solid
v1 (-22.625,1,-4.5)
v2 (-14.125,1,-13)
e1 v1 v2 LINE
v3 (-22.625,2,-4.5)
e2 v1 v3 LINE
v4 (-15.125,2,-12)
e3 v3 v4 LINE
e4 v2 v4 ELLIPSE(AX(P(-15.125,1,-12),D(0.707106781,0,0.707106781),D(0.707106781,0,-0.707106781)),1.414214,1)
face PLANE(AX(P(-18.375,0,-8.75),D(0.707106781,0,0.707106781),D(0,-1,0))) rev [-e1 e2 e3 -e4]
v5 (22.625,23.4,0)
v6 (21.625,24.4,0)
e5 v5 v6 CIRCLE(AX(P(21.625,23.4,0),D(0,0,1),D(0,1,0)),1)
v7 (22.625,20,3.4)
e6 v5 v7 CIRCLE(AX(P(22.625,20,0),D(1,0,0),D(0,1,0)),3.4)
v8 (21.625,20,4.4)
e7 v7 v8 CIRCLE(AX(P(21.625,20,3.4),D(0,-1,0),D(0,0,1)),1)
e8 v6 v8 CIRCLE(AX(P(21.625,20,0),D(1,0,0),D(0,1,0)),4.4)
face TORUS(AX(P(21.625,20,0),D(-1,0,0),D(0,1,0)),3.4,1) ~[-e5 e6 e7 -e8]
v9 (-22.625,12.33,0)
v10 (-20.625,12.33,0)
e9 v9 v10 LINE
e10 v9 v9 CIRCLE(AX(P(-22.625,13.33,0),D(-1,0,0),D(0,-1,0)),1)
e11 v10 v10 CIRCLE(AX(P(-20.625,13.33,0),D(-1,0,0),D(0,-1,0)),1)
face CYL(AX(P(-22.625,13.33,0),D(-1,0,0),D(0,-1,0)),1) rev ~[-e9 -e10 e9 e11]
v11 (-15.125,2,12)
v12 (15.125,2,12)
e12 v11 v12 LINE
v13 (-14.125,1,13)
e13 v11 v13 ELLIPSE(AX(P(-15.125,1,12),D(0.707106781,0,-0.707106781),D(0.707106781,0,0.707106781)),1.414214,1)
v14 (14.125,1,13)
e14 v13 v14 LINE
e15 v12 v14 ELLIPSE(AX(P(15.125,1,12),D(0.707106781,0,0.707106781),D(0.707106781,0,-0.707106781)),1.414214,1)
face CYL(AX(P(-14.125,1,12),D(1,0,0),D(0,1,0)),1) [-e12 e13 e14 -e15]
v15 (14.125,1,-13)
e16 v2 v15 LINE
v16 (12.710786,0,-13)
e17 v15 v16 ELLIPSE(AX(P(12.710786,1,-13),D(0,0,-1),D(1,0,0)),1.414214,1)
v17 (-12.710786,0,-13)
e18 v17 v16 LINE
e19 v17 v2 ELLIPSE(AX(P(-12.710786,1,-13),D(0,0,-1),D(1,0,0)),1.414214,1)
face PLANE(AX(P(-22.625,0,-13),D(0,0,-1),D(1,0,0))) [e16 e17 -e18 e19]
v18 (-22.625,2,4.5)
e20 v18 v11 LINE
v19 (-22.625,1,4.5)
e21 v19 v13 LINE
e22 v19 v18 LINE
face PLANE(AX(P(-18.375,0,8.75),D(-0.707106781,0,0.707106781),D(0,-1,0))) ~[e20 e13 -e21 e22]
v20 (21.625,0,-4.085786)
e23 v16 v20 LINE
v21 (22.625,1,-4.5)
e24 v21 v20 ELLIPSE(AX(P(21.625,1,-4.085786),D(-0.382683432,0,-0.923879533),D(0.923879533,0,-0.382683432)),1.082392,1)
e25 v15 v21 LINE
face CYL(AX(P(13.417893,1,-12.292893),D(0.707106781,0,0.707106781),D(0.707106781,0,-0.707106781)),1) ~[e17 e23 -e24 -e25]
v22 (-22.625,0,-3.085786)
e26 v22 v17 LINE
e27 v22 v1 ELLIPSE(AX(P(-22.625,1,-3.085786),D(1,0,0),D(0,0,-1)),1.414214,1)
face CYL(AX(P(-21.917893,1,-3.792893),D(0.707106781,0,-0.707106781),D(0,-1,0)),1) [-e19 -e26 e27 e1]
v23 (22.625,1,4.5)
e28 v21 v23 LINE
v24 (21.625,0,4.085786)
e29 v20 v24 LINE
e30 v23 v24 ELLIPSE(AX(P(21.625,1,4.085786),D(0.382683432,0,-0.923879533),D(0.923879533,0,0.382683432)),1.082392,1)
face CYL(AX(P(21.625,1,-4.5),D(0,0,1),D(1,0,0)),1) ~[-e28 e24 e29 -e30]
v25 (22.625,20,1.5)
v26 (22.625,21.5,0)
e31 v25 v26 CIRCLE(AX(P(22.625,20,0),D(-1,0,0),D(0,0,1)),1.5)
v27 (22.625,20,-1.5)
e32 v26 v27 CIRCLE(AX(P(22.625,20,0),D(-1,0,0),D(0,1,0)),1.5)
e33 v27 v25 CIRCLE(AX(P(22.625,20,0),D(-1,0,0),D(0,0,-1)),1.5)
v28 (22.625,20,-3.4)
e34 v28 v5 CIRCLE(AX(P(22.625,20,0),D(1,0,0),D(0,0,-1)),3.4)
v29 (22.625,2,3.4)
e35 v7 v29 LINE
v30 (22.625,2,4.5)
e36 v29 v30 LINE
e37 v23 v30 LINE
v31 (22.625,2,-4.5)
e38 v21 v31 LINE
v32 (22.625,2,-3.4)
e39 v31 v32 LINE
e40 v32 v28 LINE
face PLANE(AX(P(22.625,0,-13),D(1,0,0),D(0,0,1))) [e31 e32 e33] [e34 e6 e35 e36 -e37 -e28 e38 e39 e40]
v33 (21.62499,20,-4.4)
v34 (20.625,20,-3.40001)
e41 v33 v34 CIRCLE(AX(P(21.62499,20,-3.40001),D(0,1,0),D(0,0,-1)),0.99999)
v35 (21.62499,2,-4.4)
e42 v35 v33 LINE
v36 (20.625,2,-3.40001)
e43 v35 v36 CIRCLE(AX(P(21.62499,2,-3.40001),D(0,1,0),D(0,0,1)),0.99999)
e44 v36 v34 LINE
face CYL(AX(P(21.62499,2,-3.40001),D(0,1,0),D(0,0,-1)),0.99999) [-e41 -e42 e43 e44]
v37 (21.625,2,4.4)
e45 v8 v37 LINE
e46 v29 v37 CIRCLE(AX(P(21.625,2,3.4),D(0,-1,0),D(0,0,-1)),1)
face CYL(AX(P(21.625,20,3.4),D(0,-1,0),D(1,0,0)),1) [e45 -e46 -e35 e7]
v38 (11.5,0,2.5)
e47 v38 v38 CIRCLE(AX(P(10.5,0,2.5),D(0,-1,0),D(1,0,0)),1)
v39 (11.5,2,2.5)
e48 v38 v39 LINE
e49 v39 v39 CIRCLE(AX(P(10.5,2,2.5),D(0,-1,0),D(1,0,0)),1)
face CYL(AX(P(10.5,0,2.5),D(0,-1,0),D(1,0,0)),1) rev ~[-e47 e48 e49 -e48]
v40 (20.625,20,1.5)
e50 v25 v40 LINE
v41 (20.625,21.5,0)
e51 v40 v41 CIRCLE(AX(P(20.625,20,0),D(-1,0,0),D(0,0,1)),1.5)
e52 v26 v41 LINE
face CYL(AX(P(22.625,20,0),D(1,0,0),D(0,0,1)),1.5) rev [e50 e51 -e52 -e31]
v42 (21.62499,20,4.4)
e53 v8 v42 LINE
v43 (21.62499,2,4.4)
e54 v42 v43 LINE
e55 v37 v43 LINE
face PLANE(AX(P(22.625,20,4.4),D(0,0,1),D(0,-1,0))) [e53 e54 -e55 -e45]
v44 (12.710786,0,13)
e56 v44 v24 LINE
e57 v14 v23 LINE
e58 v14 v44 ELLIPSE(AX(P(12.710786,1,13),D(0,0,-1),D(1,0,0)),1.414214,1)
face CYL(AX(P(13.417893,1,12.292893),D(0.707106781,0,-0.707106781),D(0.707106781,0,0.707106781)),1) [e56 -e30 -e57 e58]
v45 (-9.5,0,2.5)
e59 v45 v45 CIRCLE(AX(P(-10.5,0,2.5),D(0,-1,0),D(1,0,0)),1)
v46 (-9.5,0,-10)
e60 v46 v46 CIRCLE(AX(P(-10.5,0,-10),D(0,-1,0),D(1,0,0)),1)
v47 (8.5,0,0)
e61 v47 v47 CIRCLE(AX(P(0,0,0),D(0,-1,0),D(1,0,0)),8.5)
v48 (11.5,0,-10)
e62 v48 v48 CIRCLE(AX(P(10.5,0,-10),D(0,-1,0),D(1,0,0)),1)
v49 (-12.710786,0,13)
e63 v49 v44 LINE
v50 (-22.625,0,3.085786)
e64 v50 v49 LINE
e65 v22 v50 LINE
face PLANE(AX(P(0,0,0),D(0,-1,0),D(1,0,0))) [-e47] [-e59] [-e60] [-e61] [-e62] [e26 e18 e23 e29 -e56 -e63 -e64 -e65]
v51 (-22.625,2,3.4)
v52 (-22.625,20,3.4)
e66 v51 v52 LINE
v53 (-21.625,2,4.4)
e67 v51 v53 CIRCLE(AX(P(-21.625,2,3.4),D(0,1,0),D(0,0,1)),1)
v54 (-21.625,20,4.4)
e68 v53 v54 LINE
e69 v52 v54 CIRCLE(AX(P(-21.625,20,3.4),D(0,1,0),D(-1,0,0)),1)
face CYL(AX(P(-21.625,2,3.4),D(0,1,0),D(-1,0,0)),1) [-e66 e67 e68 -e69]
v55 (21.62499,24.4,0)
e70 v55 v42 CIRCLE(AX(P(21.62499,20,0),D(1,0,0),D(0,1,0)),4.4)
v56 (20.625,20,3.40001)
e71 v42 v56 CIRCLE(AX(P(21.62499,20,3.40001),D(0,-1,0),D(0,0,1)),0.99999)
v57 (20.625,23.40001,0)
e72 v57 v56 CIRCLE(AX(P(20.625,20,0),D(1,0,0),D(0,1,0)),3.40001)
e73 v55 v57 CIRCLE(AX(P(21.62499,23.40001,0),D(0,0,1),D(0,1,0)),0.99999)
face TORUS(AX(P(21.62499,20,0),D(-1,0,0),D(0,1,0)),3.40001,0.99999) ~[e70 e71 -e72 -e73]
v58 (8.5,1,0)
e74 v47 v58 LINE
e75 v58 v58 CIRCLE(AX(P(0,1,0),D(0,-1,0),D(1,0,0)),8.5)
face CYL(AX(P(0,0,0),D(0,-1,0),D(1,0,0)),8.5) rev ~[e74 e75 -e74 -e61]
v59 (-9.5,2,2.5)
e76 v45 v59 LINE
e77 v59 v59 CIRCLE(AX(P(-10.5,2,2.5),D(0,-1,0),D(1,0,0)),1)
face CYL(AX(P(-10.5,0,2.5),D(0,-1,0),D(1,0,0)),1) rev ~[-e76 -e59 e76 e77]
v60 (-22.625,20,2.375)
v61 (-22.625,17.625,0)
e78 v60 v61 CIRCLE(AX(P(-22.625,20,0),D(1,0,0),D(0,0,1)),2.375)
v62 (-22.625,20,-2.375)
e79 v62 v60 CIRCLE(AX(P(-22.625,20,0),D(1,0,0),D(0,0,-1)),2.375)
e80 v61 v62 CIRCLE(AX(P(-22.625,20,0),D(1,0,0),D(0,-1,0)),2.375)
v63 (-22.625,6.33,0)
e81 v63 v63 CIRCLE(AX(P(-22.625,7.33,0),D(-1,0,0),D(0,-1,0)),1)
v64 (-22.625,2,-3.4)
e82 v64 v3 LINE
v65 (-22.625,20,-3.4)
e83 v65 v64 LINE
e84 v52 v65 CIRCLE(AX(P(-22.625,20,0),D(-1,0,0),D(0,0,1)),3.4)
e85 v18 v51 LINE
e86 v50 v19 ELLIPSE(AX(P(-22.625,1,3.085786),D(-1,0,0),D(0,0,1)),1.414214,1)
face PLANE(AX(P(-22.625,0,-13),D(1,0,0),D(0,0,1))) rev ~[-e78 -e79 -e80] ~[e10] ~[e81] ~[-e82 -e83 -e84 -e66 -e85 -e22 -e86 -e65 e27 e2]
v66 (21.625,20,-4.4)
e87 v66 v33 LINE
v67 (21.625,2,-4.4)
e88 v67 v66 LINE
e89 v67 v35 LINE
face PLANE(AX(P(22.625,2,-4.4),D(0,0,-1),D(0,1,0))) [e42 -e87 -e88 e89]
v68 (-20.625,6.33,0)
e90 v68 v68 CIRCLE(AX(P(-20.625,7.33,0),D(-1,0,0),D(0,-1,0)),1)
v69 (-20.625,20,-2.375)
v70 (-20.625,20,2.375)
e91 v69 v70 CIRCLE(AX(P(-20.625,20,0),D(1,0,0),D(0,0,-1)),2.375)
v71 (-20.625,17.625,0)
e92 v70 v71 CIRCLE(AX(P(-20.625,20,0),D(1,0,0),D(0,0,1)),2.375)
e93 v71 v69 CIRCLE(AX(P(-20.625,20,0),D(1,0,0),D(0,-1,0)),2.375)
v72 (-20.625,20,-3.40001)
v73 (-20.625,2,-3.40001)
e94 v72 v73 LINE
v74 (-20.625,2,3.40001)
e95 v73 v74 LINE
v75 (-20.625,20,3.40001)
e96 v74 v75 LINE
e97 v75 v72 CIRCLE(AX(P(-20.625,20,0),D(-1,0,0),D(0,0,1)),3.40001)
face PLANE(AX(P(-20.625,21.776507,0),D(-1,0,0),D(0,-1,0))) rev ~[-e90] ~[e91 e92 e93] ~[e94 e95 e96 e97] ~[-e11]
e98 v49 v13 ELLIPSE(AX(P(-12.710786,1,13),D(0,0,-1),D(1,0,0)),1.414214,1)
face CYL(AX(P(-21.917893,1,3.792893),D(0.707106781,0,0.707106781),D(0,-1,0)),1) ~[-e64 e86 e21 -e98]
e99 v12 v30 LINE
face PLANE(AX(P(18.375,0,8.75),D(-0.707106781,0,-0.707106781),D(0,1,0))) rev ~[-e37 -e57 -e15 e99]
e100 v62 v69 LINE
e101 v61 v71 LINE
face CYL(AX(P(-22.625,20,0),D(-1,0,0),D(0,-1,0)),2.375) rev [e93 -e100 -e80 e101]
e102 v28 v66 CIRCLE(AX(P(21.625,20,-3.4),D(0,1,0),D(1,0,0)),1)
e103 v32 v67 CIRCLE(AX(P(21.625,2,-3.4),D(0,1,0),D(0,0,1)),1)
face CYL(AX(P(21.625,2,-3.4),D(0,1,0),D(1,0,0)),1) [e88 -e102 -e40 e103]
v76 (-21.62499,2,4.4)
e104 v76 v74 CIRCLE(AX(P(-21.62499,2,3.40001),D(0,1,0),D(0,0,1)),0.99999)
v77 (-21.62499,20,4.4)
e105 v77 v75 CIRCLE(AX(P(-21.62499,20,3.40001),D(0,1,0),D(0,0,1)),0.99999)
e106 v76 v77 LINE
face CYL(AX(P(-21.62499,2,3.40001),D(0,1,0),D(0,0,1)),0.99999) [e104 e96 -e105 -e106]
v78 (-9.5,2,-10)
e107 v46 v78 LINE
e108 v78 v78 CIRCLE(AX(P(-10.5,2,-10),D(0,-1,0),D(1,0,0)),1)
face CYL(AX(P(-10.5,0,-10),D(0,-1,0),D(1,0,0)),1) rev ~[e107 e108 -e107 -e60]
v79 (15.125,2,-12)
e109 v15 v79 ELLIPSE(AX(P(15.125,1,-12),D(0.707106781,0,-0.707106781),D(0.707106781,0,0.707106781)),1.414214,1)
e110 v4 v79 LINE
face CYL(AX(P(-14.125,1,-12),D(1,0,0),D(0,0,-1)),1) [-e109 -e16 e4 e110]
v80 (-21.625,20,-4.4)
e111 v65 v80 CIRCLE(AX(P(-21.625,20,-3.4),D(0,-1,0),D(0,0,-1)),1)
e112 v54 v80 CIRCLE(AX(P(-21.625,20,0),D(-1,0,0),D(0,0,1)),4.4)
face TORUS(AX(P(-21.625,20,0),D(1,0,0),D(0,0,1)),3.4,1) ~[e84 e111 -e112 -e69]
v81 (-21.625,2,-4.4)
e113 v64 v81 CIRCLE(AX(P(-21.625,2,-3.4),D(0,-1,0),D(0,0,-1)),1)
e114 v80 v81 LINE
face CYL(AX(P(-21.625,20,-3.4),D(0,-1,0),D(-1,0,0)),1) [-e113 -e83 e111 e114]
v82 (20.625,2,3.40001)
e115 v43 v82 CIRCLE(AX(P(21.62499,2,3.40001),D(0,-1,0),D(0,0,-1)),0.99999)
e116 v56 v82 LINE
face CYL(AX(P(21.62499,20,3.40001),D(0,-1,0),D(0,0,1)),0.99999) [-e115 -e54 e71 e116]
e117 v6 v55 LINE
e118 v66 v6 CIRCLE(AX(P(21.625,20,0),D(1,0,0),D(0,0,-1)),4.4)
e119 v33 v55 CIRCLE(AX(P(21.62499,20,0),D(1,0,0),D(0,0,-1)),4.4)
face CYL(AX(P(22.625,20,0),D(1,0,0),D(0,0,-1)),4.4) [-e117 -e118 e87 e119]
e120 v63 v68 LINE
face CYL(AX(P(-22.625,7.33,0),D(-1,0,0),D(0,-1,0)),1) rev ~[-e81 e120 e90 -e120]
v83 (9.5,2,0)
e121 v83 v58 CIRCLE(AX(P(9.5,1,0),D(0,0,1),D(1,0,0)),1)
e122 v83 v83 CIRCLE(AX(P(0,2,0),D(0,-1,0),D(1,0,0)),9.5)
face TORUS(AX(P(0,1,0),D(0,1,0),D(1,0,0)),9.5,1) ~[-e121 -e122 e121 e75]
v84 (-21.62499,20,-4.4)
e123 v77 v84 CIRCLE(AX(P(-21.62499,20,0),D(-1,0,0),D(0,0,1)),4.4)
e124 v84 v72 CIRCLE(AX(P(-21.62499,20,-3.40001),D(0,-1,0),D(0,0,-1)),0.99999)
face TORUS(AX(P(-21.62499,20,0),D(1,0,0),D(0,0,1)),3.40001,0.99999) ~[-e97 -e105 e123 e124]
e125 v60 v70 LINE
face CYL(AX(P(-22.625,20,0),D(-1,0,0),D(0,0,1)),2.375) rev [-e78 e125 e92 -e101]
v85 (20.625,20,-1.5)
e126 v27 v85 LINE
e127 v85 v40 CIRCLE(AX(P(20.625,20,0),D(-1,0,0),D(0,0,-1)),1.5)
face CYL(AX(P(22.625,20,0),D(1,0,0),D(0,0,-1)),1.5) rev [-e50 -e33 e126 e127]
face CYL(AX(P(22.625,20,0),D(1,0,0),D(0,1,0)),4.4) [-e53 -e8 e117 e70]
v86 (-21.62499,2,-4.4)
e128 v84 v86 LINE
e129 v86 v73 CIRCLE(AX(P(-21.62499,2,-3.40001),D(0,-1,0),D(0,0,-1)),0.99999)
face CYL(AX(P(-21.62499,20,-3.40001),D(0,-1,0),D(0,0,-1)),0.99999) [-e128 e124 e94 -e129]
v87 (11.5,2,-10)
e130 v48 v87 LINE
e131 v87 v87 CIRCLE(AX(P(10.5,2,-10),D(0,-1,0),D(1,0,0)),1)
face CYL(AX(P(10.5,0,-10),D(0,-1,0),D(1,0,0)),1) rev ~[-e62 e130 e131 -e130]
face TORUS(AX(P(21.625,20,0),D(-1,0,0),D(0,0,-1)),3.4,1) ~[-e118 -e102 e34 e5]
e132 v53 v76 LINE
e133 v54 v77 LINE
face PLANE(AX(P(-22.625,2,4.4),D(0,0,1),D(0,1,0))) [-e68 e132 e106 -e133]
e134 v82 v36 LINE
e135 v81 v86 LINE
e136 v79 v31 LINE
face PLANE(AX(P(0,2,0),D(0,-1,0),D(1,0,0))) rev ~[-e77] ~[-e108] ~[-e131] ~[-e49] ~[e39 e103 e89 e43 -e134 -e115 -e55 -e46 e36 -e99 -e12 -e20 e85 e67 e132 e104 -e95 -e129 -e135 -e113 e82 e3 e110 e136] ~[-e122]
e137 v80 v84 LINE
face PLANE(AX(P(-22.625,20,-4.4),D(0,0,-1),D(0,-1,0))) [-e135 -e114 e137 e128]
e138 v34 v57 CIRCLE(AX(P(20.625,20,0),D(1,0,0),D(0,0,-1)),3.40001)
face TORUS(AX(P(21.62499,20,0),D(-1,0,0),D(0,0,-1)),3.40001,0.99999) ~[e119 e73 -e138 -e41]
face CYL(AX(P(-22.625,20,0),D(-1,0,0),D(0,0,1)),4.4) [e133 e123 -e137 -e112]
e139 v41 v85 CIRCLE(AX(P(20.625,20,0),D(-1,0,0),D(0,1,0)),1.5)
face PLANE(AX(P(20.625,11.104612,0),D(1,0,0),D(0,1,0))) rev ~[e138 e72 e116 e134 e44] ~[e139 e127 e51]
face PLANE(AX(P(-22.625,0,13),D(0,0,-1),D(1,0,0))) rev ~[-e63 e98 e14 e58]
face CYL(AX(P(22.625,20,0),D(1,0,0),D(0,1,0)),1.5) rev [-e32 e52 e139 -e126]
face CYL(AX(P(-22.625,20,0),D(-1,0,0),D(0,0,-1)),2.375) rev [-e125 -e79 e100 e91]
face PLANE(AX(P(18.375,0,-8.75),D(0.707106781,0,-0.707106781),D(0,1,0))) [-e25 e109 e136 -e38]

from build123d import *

# Parameters (mm, degrees)
F0_W     = 45.25
F0_H     = 26
F0_W_2   = 25
F0_H_2   = 24
F0_R     = 1
F0_R_2   = 8.5
F1_DEPTH = 2
F3_DEPTH = 2
F4_R     = 1
F5_DEPTH = 2
F6_SIZE  = 8.5
F7_R     = 1
F7_R_2   = 0.99999


# Not quite as in the source:
# - a fillet or chamfer is up to 0.001 mm smaller than in the source, because OpenCascade refuses the exact size


with BuildPart() as f1:
    # F0 (on Front) → F1 (new body)
    with BuildSketch(Plane.XZ):
        Rectangle(F0_W, F0_H)
        Rectangle(F0_W_2, F0_H_2, mode=Mode.SUBTRACT)
        Rectangle(F0_W_2, F0_H_2)
        with Locations((-10.5, -10)):
            Circle(F0_R, mode=Mode.SUBTRACT)
        with Locations((10.5, -10)):
            Circle(F0_R, mode=Mode.SUBTRACT)
        with Locations((-10.5, 2.5)):
            Circle(F0_R, mode=Mode.SUBTRACT)
        Circle(F0_R_2, mode=Mode.SUBTRACT)
        with Locations((10.5, 2.5)):
            Circle(F0_R, mode=Mode.SUBTRACT)
    extrude(amount=-F1_DEPTH)

    # F2 (on face) → F3 (join)
    with BuildSketch(Plane.YZ.offset(22.625)):
        with BuildLine():
            ThreePointArc((20, -4.4), (15.6, 0), (20, 4.4))
            Line((20, 4.4), (2, 4.4))
            Line((2, 4.4), (2, -4.4))
            Line((2, -4.4), (20, -4.4))
        make_face()
        with BuildLine():
            ThreePointArc((20, 1.5), (21.0606601718, 1.0606601718), (21.5, 0))
            ThreePointArc((21.5, 0), (21.0606601718, -1.0606601718), (20, -1.5))
            Line((20, -1.5), (20, -4.4))
            ThreePointArc((20, -4.4), (23.1112698372, -3.1112698372), (24.4, 0))
            ThreePointArc((24.4, 0), (23.1112698372, 3.1112698372), (20, 4.4))
            Line((20, 4.4), (20, 1.5))
        make_face()
        with BuildLine():
            ThreePointArc((20, -1.5), (18.5, 0), (20, 1.5))
            Line((20, 1.5), (20, 4.4))
            ThreePointArc((20, 4.4), (15.6, 0), (20, -4.4))
            Line((20, -4.4), (20, -1.5))
        make_face()
    extrude(amount=-F3_DEPTH)

    # F4 (on face) → F5 (join)
    with BuildSketch(Plane(origin=(-22.625, 0, 0), x_dir=(0, -1, 0), z_dir=(-1, 0, 0))):
        with BuildLine():
            ThreePointArc((-20, -2.375), (-22.375, 0), (-20, 2.375))
            Line((-20, 2.375), (-20, 4.4))
            ThreePointArc((-20, 4.4), (-24.4, 0), (-20, -4.4))
            Line((-20, -4.4), (-20, -2.375))
        make_face()
        with BuildLine():
            ThreePointArc((-20, 2.375), (-18.3206213947, 1.6793786053), (-17.625, 0))
            ThreePointArc((-17.625, 0), (-18.3206213947, -1.6793786053), (-20, -2.375))
            Line((-20, -2.375), (-20, -4.4))
            ThreePointArc((-20, -4.4), (-16.8887301628, -3.1112698372), (-15.6, 0))
            ThreePointArc((-15.6, 0), (-16.8887301628, 3.1112698372), (-20, 4.4))
            Line((-20, 4.4), (-20, 2.375))
        make_face()
        with BuildLine():
            Line((-2, 4.4), (-20, 4.4))
            ThreePointArc((-20, 4.4), (-16.8887301628, 3.1112698372), (-15.6, 0))
            ThreePointArc((-15.6, 0), (-16.8887301628, -3.1112698372), (-20, -4.4))
            Line((-20, -4.4), (-2, -4.4))
            Line((-2, -4.4), (-2, 4.4))
        make_face()
        with Locations((-13.33, 0)):
            Circle(F4_R, mode=Mode.SUBTRACT)
        with Locations((-7.33, 0)):
            Circle(F4_R, mode=Mode.SUBTRACT)
    extrude(amount=-F5_DEPTH)

    # F6
    f6_edges = [f1.edges().sort_by_distance(p)[0] for p in [
        (22.625, 1, 13),
        (-22.625, 1, 13),
        (-22.625, 1, -13),
        (22.625, 1, -13),
    ]]
    chamfer(f6_edges, length=F6_SIZE)

    # F7 (call 1 of 10: OpenCascade refuses the feature's edges together)
    f7_edges = [f1.edges().sort_by_distance(p)[0] for p in [
        (-8.5, 2, 0),
    ]]
    fillet(f7_edges, radius=F7_R)

    # F7#2 (call 2 of 10)
    f7_2_edges = [f1.edges().sort_by_distance(p)[0] for p in [
        (18.375, 0, 8.75),
        (18.375, 0, -8.75),
        (22.625, 0, 0),
    ]]
    fillet(f7_2_edges, radius=F7_R)

    # F7#3 (call 3 of 10)
    f7_3_edges = [f1.edges().sort_by_distance(p)[0] for p in [
        (-18.375, 0, -8.75),
    ]]
    fillet(f7_3_edges, radius=F7_R)

    # F7#4 (call 4 of 10)
    f7_4_edges = [f1.edges().sort_by_distance(p)[0] for p in [
        (-18.375, 0, 8.75),
    ]]
    fillet(f7_4_edges, radius=F7_R)

    # F7#5 (call 5 of 10)
    f7_5_edges = [f1.edges().sort_by_distance(p)[0] for p in [
        (-22.625, 11, -4.4),
    ]]
    fillet(f7_5_edges, radius=F7_R)

    # F7#6 (call 6 of 10)
    f7_6_edges = [f1.edges().sort_by_distance(p)[0] for p in [
        (22.625, 11, 4.4),
    ]]
    fillet(f7_6_edges, radius=F7_R)

    # F7#7 (call 7 of 10)
    f7_7_edges = [f1.edges().sort_by_distance(p)[0] for p in [
        (0, 2, -13),
    ]]
    fillet(f7_7_edges, radius=F7_R)

    # F7#8 (call 8 of 10)
    f7_8_edges = [f1.edges().sort_by_distance(p)[0] for p in [
        (0, 2, 13),
    ]]
    fillet(f7_8_edges, radius=F7_R)

    # F7#9 (call 9 of 10) (radius 1 in the source; OpenCascade refuses exactly that, so slightly less here)
    f7_9_edges = [f1.edges().sort_by_distance(p)[0] for p in [
        (-20.625, 11, 4.4),
    ]]
    fillet(f7_9_edges, radius=F7_R_2)

    # F7#10 (call 10 of 10) (radius 1 in the source; OpenCascade refuses exactly that, so slightly less here)
    f7_10_edges = [f1.edges().sort_by_distance(p)[0] for p in [
        (20.625, 11, 4.4),
    ]]
    fillet(f7_10_edges, radius=F7_R_2)


solid = f1.part
